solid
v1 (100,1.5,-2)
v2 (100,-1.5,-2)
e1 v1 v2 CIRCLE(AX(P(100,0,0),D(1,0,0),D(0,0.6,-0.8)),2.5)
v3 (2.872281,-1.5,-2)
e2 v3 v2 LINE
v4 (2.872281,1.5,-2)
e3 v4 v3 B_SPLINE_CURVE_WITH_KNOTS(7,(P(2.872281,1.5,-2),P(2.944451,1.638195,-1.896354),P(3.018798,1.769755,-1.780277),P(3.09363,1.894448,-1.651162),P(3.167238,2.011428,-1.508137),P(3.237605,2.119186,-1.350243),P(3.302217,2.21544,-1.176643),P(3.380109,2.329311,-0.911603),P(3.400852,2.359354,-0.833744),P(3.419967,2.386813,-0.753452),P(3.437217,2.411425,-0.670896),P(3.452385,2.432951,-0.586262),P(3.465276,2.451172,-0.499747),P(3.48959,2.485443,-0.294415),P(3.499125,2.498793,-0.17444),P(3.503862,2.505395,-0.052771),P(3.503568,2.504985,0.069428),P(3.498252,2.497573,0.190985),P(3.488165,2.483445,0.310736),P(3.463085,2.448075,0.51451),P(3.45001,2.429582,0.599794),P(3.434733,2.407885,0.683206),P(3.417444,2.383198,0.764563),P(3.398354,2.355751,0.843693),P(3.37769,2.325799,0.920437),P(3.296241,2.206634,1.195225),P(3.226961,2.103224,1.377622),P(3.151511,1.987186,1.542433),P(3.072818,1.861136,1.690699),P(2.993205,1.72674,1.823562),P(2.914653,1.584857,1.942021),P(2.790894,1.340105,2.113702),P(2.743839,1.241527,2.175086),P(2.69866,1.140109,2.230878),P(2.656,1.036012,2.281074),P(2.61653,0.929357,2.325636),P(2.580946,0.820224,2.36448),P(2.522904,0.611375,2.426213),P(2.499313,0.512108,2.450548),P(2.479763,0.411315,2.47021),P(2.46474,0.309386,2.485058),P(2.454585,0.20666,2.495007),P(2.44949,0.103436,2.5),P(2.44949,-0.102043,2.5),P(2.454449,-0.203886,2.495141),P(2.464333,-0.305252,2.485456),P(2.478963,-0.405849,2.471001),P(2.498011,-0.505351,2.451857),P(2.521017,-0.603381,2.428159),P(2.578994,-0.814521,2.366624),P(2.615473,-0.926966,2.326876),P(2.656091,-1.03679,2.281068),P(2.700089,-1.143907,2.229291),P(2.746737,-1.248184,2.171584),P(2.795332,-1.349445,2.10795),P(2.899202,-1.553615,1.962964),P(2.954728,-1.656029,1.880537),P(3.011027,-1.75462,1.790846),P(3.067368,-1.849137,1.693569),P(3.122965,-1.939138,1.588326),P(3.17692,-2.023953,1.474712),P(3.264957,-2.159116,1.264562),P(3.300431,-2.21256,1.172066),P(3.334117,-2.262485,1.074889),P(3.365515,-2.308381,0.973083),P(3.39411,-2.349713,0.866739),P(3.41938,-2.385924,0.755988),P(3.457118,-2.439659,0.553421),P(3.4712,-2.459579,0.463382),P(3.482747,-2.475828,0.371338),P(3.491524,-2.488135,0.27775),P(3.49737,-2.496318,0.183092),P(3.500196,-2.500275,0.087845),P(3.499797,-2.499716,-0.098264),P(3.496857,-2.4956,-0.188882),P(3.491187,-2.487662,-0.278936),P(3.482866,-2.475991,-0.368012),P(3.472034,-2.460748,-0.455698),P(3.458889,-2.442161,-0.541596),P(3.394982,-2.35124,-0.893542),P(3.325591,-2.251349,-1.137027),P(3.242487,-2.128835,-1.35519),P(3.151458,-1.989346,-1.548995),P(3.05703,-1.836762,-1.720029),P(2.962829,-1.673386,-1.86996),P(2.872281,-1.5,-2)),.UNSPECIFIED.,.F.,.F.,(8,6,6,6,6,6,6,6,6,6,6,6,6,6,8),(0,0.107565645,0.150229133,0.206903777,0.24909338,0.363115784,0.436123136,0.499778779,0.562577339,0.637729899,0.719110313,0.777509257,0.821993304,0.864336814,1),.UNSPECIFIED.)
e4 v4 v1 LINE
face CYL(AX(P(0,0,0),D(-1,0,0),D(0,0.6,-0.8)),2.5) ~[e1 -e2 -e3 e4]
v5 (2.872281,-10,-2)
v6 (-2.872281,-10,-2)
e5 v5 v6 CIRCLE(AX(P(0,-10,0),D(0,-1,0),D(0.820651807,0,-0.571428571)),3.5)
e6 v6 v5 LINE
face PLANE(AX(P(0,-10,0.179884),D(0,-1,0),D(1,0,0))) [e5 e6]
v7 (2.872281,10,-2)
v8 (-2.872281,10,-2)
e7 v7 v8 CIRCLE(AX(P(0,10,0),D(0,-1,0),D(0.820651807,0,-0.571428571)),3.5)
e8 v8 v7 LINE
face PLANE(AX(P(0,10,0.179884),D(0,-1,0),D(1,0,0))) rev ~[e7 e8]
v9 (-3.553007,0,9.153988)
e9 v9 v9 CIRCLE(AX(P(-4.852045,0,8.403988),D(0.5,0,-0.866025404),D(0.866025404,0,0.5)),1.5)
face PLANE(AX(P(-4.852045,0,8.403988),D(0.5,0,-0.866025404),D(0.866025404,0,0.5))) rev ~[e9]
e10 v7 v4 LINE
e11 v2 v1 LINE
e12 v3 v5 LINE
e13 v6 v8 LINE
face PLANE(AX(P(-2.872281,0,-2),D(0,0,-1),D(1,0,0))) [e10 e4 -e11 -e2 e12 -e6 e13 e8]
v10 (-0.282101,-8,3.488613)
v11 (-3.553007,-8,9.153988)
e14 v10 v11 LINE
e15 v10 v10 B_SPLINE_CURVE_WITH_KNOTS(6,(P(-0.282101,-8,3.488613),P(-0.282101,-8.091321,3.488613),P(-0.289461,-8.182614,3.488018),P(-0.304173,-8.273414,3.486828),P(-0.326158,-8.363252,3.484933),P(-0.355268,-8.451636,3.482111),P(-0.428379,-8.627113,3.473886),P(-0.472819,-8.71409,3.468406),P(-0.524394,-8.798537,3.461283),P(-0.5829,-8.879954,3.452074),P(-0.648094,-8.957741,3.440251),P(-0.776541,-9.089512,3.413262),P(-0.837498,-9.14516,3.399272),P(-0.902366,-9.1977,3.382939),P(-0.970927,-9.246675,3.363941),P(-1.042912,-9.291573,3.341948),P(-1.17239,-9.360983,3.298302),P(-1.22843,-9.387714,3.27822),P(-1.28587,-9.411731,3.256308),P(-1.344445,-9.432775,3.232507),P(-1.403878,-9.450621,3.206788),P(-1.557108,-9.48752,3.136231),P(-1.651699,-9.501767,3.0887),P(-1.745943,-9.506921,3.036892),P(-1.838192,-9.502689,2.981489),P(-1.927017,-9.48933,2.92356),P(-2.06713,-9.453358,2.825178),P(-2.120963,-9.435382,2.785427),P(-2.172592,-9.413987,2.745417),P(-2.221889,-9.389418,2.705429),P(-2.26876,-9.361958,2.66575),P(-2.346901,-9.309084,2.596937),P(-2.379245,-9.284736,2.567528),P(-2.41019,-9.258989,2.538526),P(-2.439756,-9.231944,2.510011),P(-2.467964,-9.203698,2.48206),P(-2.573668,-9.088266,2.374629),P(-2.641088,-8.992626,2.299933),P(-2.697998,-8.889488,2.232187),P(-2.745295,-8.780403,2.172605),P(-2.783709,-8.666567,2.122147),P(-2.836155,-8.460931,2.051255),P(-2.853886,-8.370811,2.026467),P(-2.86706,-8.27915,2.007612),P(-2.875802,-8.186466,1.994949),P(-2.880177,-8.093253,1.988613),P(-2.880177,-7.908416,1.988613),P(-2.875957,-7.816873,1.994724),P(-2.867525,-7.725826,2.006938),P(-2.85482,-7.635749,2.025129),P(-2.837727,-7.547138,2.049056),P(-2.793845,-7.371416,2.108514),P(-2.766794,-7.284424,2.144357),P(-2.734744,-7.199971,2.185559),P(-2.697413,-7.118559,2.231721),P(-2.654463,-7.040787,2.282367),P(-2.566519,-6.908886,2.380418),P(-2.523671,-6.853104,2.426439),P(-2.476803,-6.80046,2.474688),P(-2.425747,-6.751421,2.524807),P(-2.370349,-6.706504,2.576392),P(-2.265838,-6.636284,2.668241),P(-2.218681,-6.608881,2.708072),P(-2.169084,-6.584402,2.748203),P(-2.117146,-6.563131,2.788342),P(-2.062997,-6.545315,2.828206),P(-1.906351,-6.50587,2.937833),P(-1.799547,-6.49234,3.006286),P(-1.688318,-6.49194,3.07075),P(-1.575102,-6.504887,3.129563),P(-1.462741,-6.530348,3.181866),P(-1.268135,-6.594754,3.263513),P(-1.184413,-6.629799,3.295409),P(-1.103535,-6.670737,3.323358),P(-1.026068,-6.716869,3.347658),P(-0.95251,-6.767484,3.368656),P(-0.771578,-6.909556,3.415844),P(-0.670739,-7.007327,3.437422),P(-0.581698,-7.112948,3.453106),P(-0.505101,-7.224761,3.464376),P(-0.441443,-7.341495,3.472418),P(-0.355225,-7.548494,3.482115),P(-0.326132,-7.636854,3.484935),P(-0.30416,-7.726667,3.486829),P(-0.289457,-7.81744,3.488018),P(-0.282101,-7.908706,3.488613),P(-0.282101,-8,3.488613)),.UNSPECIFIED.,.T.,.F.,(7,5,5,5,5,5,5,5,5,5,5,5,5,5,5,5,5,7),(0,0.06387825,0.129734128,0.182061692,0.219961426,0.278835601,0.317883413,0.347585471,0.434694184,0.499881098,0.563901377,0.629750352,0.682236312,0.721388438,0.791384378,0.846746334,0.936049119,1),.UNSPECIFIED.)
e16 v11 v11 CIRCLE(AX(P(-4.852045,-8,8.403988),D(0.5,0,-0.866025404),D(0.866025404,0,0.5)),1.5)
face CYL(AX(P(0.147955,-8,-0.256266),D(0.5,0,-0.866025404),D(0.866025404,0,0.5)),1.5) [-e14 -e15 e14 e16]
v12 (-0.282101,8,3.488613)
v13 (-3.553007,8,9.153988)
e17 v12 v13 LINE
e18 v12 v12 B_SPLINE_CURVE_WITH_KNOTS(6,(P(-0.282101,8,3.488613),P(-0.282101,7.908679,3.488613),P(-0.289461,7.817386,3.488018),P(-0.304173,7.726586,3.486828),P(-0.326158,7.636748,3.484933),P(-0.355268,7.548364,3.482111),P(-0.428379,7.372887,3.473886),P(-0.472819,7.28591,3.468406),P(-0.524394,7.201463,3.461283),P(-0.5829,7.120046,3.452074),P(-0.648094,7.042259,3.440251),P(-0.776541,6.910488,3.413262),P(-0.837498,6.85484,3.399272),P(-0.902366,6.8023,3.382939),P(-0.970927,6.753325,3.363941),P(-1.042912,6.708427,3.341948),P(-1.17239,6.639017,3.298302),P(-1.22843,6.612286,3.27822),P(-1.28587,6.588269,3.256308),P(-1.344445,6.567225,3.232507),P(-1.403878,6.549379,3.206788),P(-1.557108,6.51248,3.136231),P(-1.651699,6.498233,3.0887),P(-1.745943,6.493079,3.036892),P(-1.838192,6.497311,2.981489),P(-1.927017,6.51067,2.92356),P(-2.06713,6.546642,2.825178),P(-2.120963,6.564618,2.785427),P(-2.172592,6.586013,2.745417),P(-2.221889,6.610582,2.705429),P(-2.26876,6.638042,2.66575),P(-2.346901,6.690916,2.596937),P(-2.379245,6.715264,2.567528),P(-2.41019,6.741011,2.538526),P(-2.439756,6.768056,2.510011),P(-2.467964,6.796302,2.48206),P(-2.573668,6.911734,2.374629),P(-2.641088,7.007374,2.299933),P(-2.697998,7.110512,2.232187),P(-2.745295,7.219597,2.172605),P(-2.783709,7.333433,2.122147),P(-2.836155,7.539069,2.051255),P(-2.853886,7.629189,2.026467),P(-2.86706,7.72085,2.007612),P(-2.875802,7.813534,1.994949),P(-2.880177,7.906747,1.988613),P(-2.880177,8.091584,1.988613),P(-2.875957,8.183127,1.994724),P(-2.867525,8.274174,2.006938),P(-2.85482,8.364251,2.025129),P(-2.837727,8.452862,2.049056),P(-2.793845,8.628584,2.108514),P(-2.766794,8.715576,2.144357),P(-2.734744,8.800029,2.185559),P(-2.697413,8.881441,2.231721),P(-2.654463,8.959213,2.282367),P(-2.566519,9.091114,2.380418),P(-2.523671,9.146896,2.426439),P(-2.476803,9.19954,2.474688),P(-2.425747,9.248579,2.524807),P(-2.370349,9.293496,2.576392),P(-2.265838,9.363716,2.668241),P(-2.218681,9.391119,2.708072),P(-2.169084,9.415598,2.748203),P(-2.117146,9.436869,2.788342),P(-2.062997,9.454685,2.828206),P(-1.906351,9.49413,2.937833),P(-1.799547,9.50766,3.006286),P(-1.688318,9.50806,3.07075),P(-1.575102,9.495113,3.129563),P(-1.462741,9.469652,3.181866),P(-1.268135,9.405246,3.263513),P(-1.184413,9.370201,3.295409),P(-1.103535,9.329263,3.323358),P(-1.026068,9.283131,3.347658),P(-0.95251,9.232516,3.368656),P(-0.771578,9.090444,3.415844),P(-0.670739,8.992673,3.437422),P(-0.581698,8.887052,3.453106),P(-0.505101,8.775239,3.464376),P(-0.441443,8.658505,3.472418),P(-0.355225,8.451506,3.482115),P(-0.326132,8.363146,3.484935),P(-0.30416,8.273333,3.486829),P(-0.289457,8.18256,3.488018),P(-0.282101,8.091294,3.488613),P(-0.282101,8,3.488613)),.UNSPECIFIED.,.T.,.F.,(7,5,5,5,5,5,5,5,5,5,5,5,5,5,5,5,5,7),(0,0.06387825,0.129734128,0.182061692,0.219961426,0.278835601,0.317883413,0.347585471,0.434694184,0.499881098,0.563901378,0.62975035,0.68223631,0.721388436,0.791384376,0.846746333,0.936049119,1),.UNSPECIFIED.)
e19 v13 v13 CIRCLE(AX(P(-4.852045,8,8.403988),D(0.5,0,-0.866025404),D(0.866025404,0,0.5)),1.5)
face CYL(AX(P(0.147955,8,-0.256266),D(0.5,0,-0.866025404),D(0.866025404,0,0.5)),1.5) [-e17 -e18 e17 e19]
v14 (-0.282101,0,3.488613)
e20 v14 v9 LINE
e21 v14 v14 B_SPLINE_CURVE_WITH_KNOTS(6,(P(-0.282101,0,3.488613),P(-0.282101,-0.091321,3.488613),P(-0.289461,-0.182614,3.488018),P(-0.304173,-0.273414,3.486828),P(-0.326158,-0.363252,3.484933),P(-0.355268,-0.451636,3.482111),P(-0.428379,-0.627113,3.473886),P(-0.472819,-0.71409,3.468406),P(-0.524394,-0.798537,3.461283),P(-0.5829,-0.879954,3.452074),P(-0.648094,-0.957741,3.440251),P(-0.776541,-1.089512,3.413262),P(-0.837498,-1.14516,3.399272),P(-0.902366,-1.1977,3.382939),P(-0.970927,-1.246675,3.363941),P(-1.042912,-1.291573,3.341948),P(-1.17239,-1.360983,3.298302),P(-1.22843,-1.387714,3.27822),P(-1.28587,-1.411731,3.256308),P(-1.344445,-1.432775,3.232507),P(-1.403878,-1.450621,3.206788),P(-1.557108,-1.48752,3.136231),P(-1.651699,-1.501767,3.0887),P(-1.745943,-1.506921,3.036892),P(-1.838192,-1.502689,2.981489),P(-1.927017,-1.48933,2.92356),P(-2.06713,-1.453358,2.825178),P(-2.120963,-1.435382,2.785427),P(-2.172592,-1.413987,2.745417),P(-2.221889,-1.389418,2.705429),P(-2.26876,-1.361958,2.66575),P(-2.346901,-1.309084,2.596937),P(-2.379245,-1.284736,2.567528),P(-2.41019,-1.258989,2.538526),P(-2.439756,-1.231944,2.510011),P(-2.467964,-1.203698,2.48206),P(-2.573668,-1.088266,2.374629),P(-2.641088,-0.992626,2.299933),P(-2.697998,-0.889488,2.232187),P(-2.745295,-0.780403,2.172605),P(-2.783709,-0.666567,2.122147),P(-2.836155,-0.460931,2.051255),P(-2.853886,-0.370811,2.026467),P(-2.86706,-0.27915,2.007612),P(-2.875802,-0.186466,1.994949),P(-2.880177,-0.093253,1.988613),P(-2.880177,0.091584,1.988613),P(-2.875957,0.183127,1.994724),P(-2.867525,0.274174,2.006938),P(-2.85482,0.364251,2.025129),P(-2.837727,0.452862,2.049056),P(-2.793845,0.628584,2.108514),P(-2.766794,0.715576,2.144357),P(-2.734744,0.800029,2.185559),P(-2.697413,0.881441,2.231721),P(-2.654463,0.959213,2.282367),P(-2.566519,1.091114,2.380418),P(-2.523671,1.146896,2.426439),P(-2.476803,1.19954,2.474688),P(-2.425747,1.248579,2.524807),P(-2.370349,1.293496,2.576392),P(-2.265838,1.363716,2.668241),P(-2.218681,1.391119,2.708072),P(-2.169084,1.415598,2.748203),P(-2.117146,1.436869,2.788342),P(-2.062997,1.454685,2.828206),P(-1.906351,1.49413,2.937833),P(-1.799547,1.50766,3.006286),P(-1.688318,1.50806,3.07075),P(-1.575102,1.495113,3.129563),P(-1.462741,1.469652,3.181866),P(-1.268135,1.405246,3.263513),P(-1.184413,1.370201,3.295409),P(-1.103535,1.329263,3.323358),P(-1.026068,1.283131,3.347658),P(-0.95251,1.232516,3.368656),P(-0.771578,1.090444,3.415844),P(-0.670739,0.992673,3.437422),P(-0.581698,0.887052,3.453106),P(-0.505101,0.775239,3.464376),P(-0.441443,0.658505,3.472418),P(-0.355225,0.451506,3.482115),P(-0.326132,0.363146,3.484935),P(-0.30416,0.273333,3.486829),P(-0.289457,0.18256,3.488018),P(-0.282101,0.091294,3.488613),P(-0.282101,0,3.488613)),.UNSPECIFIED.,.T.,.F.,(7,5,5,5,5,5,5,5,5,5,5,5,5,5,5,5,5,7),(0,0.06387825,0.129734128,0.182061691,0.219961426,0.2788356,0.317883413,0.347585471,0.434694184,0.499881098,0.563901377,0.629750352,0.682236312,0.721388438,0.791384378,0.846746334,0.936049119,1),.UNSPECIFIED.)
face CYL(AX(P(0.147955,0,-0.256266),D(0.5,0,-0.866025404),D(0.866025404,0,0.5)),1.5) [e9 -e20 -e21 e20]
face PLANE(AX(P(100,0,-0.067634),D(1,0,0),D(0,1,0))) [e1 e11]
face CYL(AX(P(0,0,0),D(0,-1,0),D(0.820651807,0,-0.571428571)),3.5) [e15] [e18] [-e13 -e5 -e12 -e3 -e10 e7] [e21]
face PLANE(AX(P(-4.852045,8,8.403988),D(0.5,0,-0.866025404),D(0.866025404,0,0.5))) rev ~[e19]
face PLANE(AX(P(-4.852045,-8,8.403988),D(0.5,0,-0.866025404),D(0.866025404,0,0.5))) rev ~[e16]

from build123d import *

# Parameters (mm, degrees)
F1_DEPTH        = 10
F3_DEPTH        = 100
F5_R            = 1.5
F6_DEPTH        = 10
F6_COPIES_COUNT = 2
F6_COPIES_PITCH = 8


# Not quite as in the source:
# - a pattern or mirror of a feature is missing from the dataset's text; its kind, count and spacing are read off the source's solid


with BuildPart() as f1:
    # F0 (on Front) → F1 (new body, symmetric)
    with BuildSketch(Plane.XZ):
        with BuildLine():
            Line((-2.8722813233, -2), (2.8722813233, -2))
            ThreePointArc((2.8722813233, -2), (0, 3.5), (-2.8722813233, -2))
        make_face()
    extrude(amount=F1_DEPTH, both=True)

    # F2 (on Right) → F3 (join)
    with BuildSketch(Plane.YZ):
        with BuildLine():
            Line((-1.5, -2), (1.5, -2))
            ThreePointArc((1.5, -2), (0, 2.5), (-1.5, -2))
        make_face()
    extrude(amount=F3_DEPTH)

    # F5 (on face) → F6 (join)
    with BuildSketch(Plane(origin=(0.147955073, 0, -0.2562657036), x_dir=(0.8660254038, 0, 0.5), z_dir=(0.5, 0, -0.8660254038))):
        Circle(F5_R)
        with Locations((0, -8)):
            Circle(F5_R)
    f6 = extrude(amount=-F6_DEPTH)

    # F6_copies: F6 ×2
    with Locations(*[(0, -i * F6_COPIES_PITCH, 0) for i in range(1, F6_COPIES_COUNT)]):
        add(f6)


solid = f1.part
